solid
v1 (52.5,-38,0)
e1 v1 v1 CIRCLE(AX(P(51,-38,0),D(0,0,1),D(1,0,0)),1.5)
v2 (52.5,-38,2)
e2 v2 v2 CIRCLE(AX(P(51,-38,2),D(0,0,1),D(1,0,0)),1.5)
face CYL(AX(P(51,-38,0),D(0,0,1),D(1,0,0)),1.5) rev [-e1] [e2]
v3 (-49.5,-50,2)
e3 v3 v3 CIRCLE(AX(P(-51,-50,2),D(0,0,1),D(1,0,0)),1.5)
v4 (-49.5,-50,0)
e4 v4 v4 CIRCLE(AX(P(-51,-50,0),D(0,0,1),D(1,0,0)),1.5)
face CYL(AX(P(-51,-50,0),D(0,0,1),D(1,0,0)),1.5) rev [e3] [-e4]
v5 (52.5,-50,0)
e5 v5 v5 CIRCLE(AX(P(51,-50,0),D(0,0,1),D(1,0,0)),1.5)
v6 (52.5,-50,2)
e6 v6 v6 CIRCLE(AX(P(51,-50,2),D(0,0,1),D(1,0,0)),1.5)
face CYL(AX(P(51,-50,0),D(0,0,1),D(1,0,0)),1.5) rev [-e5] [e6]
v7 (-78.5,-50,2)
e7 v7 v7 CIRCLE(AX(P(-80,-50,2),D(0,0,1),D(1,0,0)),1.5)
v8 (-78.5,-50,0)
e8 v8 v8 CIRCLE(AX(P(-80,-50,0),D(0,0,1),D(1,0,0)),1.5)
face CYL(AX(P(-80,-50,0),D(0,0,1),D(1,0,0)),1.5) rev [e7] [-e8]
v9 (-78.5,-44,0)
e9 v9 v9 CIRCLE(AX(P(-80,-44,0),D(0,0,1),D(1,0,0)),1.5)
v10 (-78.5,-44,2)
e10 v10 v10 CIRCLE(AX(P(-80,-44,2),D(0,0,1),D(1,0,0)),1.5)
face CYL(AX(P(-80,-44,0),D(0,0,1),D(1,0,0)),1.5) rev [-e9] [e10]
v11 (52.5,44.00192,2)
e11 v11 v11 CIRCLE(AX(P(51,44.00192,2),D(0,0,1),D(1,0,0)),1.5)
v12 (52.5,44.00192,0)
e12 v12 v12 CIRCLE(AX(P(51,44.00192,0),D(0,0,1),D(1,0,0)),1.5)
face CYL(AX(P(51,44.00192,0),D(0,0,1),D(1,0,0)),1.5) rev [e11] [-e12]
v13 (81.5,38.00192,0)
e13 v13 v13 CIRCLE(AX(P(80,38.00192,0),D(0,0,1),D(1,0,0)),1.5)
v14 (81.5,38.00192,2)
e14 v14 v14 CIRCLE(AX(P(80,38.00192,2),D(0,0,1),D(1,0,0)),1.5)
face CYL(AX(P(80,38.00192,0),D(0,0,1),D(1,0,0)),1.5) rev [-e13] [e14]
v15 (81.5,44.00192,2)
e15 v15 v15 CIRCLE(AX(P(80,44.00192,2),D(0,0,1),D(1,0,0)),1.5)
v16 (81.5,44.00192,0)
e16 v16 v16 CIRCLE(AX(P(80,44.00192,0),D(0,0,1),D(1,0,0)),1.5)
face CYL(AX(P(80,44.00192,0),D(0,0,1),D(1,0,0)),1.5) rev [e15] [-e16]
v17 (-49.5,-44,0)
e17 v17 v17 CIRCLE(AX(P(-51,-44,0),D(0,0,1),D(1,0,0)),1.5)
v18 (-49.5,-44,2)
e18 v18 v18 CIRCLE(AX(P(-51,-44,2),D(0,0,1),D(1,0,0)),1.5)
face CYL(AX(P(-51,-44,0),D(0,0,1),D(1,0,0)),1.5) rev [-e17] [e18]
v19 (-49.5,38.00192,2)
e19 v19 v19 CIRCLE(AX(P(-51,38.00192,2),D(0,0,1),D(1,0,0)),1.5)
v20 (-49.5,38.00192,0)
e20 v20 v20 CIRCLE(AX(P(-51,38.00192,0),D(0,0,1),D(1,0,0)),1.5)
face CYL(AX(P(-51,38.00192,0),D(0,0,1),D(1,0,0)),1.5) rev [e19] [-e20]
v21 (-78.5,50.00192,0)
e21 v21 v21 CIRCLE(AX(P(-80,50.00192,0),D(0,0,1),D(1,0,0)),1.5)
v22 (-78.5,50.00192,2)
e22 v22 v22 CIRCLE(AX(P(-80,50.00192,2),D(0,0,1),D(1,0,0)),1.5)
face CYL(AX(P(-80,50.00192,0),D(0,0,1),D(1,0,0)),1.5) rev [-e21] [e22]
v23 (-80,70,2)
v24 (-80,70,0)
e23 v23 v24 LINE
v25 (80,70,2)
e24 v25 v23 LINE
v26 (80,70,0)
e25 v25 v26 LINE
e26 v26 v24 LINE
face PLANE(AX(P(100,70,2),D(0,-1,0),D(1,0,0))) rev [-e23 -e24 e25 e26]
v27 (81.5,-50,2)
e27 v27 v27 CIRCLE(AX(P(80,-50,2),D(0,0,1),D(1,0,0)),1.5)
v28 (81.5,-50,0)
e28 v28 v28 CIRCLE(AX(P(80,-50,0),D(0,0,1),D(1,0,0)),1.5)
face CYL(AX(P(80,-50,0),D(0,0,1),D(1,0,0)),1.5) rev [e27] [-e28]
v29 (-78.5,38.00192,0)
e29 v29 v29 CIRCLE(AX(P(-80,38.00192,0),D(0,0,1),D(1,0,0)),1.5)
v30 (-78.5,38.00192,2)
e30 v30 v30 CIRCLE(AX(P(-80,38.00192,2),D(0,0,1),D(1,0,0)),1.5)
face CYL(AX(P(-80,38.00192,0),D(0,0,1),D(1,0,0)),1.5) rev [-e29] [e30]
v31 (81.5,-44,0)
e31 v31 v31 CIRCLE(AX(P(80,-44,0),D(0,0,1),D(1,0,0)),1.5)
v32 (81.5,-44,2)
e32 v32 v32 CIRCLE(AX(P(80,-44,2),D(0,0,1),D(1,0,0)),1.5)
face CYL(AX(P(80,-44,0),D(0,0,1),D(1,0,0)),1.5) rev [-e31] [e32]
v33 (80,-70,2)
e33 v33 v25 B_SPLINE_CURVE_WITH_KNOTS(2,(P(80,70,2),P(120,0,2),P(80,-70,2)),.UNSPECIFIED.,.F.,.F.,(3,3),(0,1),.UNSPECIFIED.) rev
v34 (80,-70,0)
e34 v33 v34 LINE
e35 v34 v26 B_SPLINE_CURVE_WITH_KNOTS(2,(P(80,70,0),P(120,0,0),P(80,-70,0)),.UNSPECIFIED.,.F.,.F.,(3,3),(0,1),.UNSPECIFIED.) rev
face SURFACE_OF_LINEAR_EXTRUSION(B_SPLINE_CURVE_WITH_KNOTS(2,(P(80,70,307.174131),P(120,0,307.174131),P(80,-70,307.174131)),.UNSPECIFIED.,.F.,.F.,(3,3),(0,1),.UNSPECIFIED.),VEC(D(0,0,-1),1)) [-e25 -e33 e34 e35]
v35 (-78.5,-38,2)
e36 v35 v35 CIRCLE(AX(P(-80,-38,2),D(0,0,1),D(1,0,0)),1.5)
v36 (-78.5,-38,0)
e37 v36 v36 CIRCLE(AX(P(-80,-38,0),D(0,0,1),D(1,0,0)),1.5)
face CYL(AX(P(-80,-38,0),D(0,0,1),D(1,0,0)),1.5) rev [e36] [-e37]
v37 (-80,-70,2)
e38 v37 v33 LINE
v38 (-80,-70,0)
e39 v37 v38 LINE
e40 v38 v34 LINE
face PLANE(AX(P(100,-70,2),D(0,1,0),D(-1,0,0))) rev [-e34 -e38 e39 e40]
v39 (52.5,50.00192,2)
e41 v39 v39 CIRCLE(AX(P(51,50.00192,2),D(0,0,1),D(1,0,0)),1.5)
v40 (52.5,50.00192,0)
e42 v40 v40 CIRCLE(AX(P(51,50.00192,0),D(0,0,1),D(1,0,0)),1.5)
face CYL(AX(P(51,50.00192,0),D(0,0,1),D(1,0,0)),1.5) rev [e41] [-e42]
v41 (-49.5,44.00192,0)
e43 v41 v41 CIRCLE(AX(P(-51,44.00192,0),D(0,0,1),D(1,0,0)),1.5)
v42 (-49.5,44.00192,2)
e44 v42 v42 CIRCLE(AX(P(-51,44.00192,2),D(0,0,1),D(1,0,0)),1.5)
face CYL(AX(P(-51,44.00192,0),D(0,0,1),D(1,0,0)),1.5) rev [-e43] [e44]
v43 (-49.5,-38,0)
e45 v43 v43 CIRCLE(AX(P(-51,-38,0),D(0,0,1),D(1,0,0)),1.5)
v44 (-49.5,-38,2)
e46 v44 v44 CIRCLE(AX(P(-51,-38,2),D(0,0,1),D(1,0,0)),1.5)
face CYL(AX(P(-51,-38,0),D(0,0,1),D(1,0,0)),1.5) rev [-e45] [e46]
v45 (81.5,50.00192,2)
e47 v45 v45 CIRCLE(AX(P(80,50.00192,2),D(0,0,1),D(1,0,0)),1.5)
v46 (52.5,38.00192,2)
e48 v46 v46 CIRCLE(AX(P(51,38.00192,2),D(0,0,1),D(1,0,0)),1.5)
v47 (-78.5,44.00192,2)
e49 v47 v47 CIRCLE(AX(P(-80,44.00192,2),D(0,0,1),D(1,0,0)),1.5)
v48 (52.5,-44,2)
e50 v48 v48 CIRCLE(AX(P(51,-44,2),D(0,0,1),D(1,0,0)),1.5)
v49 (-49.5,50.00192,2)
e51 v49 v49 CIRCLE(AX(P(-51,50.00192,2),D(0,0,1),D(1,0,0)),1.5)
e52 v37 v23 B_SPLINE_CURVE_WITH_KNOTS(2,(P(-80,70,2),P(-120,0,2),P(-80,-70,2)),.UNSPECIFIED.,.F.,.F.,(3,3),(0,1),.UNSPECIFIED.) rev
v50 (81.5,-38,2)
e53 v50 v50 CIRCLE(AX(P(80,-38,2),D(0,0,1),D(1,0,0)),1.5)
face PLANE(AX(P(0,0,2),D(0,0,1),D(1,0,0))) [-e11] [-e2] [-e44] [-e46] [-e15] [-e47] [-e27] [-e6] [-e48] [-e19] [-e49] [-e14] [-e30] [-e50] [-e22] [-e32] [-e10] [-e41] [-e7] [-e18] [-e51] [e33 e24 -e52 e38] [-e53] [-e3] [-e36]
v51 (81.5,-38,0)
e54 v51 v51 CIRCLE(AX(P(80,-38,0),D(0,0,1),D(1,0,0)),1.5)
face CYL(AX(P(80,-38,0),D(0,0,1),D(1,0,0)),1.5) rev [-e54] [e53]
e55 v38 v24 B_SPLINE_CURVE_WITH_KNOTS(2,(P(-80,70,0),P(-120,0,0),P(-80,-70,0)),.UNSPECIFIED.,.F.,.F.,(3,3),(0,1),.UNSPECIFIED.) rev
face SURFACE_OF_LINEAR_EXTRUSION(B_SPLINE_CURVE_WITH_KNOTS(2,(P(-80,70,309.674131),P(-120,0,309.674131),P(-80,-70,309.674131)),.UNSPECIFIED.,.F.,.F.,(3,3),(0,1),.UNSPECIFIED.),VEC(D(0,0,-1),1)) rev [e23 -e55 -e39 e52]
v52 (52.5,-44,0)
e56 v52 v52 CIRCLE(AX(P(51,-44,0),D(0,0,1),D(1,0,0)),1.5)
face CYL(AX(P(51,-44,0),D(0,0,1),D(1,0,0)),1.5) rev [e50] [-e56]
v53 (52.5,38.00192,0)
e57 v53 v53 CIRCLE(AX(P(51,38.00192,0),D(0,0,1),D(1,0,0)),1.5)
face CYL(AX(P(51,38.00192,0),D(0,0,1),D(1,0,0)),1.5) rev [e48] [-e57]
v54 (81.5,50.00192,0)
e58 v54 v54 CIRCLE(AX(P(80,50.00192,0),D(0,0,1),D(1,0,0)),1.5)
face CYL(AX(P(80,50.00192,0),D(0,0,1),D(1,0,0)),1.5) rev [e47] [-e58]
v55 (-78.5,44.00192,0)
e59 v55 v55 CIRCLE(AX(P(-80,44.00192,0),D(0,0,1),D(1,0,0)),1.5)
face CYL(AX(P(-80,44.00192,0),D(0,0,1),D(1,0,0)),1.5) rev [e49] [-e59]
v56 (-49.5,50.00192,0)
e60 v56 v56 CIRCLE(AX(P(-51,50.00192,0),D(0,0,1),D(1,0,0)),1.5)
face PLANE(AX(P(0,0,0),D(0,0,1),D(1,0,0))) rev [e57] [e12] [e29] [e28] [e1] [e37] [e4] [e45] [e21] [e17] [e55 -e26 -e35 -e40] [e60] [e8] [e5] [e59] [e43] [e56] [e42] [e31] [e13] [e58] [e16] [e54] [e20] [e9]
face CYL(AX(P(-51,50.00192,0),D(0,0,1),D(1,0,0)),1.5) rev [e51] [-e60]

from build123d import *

# Parameters (mm, degrees)
SKETCH3_W               = 200
SKETCH3_H               = 140
BOSS_EXTRUDE1_DEPTH     = 2
SKETCH7_R               = 1.5
CUT_EXTRUDE1_DEPTH      = 123.081939696
SKETCH8_R               = 1.5
CUT_EXTRUDE2_DEPTH      = 123.081939696
CUT_EXTRUDE5_START      = -2
CUT_EXTRUDE5_DEPTH      = 2
CUT_EXTRUDE6_DEPTH      = 123.081939837
CUT_EXTRUDE6_DEPTH_BACK = 123.081939837


# Read off the part's stored shape, not the designer's step: Cut-Extrude5
with BuildPart() as part:
    # Sketch3 → Boss-Extrude1 (new body)
    with BuildSketch(Plane.XY):
        Rectangle(SKETCH3_W, SKETCH3_H)
    extrude(amount=BOSS_EXTRUDE1_DEPTH)

    # Sketch7 → Cut-Extrude1 (cut, through all)
    with BuildSketch(Plane.XY.offset(2)):
        with Locations((-80, -44)):
            Circle(SKETCH7_R)
        with Locations((-51, -50)):
            Circle(SKETCH7_R)
        with Locations((-51, -38)):
            Circle(SKETCH7_R)
        with Locations((-51, -44)):
            Circle(SKETCH7_R)
        with Locations((-80, -50)):
            Circle(SKETCH7_R)
        with Locations((-80, -38)):
            Circle(SKETCH7_R)
    extrude(amount=-CUT_EXTRUDE1_DEPTH, mode=Mode.SUBTRACT)

    # Sketch8 → Cut-Extrude2 (cut, through all)
    with BuildSketch(Plane.XY.offset(2)):
        with Locations((-80, 50.001919615)):
            Circle(SKETCH8_R)
        with Locations((-80, 44.001919615)):
            Circle(SKETCH8_R)
        with Locations((-80, 38.001919615)):
            Circle(SKETCH8_R)
        with Locations((-51, 50.001919615)):
            Circle(SKETCH8_R)
        with Locations((-51, 44.001919615)):
            Circle(SKETCH8_R)
        with Locations((-51, 38.001919615)):
            Circle(SKETCH8_R)
        with Locations((80, 50.001919615)):
            Circle(SKETCH8_R)
        with Locations((80, 44.001919615)):
            Circle(SKETCH8_R)
        with Locations((80, 38.001919615)):
            Circle(SKETCH8_R)
        with Locations((51, 50.001919615)):
            Circle(SKETCH8_R)
        with Locations((51, 44.001919615)):
            Circle(SKETCH8_R)
        with Locations((51, 38.001919615)):
            Circle(SKETCH8_R)
        with Locations((51, -38)):
            Circle(SKETCH8_R)
        with Locations((51, -44)):
            Circle(SKETCH8_R)
        with Locations((51, -50)):
            Circle(SKETCH8_R)
        with Locations((80, -38)):
            Circle(SKETCH8_R)
        with Locations((80, -44)):
            Circle(SKETCH8_R)
        with Locations((80, -50)):
            Circle(SKETCH8_R)
    extrude(amount=-CUT_EXTRUDE2_DEPTH, mode=Mode.SUBTRACT)

    # Cut-Extrude5 outline → Cut-Extrude5 (cut)
    with BuildSketch(Plane.XY.offset(2).offset(CUT_EXTRUDE5_START)):
        with BuildLine():
            add(Edge.make_bspline(
                [(-100, 0), (-100, -35), (-80, -70)],
                knots=[0.5, 0.5, 0.5, 1, 1, 1], degree=2))
            Line((-100, 0), (-100, -70))
            Line((-100, -70), (-80, -70))
        make_face()
        with BuildLine():
            add(Edge.make_bspline(
                [(-80, 70), (-100, 35), (-100, 0)],
                knots=[0, 0, 0, 0.5, 0.5, 0.5], degree=2))
            Line((-80, 70), (-100, 70))
            Line((-100, 70), (-100, 0))
        make_face()
    extrude(amount=CUT_EXTRUDE5_DEPTH, mode=Mode.SUBTRACT)

    # Sketch16 → Cut-Extrude6 (cut, two sides: drawn at the far end of the back side and taken through both)
    with BuildSketch(Plane.XY.offset(2).offset(-CUT_EXTRUDE6_DEPTH_BACK)):
        with BuildLine():
            Line((100, 70), (80, 70))
            add(Edge.make_bspline(
                [(80, 70), (100.000000027, 34.999999953), (100, -9.3e-08)],
                knots=[0, 0, 0, 0.500000001, 0.500000001, 0.500000001], degree=2))
            Line((100, -9.3e-08), (100, 70))
        make_face()
        with BuildLine():
            Line((100, -70), (100, -9.3e-08))
            add(Edge.make_bspline(
                [(100, -9.3e-08), (99.999999973, -35.000000047), (80, -70)],
                knots=[0.500000001, 0.500000001, 0.500000001, 1, 1, 1], degree=2))
            Line((80, -70), (100, -70))
        make_face()
    extrude(amount=CUT_EXTRUDE6_DEPTH + CUT_EXTRUDE6_DEPTH_BACK, mode=Mode.SUBTRACT)


solid = part.part
